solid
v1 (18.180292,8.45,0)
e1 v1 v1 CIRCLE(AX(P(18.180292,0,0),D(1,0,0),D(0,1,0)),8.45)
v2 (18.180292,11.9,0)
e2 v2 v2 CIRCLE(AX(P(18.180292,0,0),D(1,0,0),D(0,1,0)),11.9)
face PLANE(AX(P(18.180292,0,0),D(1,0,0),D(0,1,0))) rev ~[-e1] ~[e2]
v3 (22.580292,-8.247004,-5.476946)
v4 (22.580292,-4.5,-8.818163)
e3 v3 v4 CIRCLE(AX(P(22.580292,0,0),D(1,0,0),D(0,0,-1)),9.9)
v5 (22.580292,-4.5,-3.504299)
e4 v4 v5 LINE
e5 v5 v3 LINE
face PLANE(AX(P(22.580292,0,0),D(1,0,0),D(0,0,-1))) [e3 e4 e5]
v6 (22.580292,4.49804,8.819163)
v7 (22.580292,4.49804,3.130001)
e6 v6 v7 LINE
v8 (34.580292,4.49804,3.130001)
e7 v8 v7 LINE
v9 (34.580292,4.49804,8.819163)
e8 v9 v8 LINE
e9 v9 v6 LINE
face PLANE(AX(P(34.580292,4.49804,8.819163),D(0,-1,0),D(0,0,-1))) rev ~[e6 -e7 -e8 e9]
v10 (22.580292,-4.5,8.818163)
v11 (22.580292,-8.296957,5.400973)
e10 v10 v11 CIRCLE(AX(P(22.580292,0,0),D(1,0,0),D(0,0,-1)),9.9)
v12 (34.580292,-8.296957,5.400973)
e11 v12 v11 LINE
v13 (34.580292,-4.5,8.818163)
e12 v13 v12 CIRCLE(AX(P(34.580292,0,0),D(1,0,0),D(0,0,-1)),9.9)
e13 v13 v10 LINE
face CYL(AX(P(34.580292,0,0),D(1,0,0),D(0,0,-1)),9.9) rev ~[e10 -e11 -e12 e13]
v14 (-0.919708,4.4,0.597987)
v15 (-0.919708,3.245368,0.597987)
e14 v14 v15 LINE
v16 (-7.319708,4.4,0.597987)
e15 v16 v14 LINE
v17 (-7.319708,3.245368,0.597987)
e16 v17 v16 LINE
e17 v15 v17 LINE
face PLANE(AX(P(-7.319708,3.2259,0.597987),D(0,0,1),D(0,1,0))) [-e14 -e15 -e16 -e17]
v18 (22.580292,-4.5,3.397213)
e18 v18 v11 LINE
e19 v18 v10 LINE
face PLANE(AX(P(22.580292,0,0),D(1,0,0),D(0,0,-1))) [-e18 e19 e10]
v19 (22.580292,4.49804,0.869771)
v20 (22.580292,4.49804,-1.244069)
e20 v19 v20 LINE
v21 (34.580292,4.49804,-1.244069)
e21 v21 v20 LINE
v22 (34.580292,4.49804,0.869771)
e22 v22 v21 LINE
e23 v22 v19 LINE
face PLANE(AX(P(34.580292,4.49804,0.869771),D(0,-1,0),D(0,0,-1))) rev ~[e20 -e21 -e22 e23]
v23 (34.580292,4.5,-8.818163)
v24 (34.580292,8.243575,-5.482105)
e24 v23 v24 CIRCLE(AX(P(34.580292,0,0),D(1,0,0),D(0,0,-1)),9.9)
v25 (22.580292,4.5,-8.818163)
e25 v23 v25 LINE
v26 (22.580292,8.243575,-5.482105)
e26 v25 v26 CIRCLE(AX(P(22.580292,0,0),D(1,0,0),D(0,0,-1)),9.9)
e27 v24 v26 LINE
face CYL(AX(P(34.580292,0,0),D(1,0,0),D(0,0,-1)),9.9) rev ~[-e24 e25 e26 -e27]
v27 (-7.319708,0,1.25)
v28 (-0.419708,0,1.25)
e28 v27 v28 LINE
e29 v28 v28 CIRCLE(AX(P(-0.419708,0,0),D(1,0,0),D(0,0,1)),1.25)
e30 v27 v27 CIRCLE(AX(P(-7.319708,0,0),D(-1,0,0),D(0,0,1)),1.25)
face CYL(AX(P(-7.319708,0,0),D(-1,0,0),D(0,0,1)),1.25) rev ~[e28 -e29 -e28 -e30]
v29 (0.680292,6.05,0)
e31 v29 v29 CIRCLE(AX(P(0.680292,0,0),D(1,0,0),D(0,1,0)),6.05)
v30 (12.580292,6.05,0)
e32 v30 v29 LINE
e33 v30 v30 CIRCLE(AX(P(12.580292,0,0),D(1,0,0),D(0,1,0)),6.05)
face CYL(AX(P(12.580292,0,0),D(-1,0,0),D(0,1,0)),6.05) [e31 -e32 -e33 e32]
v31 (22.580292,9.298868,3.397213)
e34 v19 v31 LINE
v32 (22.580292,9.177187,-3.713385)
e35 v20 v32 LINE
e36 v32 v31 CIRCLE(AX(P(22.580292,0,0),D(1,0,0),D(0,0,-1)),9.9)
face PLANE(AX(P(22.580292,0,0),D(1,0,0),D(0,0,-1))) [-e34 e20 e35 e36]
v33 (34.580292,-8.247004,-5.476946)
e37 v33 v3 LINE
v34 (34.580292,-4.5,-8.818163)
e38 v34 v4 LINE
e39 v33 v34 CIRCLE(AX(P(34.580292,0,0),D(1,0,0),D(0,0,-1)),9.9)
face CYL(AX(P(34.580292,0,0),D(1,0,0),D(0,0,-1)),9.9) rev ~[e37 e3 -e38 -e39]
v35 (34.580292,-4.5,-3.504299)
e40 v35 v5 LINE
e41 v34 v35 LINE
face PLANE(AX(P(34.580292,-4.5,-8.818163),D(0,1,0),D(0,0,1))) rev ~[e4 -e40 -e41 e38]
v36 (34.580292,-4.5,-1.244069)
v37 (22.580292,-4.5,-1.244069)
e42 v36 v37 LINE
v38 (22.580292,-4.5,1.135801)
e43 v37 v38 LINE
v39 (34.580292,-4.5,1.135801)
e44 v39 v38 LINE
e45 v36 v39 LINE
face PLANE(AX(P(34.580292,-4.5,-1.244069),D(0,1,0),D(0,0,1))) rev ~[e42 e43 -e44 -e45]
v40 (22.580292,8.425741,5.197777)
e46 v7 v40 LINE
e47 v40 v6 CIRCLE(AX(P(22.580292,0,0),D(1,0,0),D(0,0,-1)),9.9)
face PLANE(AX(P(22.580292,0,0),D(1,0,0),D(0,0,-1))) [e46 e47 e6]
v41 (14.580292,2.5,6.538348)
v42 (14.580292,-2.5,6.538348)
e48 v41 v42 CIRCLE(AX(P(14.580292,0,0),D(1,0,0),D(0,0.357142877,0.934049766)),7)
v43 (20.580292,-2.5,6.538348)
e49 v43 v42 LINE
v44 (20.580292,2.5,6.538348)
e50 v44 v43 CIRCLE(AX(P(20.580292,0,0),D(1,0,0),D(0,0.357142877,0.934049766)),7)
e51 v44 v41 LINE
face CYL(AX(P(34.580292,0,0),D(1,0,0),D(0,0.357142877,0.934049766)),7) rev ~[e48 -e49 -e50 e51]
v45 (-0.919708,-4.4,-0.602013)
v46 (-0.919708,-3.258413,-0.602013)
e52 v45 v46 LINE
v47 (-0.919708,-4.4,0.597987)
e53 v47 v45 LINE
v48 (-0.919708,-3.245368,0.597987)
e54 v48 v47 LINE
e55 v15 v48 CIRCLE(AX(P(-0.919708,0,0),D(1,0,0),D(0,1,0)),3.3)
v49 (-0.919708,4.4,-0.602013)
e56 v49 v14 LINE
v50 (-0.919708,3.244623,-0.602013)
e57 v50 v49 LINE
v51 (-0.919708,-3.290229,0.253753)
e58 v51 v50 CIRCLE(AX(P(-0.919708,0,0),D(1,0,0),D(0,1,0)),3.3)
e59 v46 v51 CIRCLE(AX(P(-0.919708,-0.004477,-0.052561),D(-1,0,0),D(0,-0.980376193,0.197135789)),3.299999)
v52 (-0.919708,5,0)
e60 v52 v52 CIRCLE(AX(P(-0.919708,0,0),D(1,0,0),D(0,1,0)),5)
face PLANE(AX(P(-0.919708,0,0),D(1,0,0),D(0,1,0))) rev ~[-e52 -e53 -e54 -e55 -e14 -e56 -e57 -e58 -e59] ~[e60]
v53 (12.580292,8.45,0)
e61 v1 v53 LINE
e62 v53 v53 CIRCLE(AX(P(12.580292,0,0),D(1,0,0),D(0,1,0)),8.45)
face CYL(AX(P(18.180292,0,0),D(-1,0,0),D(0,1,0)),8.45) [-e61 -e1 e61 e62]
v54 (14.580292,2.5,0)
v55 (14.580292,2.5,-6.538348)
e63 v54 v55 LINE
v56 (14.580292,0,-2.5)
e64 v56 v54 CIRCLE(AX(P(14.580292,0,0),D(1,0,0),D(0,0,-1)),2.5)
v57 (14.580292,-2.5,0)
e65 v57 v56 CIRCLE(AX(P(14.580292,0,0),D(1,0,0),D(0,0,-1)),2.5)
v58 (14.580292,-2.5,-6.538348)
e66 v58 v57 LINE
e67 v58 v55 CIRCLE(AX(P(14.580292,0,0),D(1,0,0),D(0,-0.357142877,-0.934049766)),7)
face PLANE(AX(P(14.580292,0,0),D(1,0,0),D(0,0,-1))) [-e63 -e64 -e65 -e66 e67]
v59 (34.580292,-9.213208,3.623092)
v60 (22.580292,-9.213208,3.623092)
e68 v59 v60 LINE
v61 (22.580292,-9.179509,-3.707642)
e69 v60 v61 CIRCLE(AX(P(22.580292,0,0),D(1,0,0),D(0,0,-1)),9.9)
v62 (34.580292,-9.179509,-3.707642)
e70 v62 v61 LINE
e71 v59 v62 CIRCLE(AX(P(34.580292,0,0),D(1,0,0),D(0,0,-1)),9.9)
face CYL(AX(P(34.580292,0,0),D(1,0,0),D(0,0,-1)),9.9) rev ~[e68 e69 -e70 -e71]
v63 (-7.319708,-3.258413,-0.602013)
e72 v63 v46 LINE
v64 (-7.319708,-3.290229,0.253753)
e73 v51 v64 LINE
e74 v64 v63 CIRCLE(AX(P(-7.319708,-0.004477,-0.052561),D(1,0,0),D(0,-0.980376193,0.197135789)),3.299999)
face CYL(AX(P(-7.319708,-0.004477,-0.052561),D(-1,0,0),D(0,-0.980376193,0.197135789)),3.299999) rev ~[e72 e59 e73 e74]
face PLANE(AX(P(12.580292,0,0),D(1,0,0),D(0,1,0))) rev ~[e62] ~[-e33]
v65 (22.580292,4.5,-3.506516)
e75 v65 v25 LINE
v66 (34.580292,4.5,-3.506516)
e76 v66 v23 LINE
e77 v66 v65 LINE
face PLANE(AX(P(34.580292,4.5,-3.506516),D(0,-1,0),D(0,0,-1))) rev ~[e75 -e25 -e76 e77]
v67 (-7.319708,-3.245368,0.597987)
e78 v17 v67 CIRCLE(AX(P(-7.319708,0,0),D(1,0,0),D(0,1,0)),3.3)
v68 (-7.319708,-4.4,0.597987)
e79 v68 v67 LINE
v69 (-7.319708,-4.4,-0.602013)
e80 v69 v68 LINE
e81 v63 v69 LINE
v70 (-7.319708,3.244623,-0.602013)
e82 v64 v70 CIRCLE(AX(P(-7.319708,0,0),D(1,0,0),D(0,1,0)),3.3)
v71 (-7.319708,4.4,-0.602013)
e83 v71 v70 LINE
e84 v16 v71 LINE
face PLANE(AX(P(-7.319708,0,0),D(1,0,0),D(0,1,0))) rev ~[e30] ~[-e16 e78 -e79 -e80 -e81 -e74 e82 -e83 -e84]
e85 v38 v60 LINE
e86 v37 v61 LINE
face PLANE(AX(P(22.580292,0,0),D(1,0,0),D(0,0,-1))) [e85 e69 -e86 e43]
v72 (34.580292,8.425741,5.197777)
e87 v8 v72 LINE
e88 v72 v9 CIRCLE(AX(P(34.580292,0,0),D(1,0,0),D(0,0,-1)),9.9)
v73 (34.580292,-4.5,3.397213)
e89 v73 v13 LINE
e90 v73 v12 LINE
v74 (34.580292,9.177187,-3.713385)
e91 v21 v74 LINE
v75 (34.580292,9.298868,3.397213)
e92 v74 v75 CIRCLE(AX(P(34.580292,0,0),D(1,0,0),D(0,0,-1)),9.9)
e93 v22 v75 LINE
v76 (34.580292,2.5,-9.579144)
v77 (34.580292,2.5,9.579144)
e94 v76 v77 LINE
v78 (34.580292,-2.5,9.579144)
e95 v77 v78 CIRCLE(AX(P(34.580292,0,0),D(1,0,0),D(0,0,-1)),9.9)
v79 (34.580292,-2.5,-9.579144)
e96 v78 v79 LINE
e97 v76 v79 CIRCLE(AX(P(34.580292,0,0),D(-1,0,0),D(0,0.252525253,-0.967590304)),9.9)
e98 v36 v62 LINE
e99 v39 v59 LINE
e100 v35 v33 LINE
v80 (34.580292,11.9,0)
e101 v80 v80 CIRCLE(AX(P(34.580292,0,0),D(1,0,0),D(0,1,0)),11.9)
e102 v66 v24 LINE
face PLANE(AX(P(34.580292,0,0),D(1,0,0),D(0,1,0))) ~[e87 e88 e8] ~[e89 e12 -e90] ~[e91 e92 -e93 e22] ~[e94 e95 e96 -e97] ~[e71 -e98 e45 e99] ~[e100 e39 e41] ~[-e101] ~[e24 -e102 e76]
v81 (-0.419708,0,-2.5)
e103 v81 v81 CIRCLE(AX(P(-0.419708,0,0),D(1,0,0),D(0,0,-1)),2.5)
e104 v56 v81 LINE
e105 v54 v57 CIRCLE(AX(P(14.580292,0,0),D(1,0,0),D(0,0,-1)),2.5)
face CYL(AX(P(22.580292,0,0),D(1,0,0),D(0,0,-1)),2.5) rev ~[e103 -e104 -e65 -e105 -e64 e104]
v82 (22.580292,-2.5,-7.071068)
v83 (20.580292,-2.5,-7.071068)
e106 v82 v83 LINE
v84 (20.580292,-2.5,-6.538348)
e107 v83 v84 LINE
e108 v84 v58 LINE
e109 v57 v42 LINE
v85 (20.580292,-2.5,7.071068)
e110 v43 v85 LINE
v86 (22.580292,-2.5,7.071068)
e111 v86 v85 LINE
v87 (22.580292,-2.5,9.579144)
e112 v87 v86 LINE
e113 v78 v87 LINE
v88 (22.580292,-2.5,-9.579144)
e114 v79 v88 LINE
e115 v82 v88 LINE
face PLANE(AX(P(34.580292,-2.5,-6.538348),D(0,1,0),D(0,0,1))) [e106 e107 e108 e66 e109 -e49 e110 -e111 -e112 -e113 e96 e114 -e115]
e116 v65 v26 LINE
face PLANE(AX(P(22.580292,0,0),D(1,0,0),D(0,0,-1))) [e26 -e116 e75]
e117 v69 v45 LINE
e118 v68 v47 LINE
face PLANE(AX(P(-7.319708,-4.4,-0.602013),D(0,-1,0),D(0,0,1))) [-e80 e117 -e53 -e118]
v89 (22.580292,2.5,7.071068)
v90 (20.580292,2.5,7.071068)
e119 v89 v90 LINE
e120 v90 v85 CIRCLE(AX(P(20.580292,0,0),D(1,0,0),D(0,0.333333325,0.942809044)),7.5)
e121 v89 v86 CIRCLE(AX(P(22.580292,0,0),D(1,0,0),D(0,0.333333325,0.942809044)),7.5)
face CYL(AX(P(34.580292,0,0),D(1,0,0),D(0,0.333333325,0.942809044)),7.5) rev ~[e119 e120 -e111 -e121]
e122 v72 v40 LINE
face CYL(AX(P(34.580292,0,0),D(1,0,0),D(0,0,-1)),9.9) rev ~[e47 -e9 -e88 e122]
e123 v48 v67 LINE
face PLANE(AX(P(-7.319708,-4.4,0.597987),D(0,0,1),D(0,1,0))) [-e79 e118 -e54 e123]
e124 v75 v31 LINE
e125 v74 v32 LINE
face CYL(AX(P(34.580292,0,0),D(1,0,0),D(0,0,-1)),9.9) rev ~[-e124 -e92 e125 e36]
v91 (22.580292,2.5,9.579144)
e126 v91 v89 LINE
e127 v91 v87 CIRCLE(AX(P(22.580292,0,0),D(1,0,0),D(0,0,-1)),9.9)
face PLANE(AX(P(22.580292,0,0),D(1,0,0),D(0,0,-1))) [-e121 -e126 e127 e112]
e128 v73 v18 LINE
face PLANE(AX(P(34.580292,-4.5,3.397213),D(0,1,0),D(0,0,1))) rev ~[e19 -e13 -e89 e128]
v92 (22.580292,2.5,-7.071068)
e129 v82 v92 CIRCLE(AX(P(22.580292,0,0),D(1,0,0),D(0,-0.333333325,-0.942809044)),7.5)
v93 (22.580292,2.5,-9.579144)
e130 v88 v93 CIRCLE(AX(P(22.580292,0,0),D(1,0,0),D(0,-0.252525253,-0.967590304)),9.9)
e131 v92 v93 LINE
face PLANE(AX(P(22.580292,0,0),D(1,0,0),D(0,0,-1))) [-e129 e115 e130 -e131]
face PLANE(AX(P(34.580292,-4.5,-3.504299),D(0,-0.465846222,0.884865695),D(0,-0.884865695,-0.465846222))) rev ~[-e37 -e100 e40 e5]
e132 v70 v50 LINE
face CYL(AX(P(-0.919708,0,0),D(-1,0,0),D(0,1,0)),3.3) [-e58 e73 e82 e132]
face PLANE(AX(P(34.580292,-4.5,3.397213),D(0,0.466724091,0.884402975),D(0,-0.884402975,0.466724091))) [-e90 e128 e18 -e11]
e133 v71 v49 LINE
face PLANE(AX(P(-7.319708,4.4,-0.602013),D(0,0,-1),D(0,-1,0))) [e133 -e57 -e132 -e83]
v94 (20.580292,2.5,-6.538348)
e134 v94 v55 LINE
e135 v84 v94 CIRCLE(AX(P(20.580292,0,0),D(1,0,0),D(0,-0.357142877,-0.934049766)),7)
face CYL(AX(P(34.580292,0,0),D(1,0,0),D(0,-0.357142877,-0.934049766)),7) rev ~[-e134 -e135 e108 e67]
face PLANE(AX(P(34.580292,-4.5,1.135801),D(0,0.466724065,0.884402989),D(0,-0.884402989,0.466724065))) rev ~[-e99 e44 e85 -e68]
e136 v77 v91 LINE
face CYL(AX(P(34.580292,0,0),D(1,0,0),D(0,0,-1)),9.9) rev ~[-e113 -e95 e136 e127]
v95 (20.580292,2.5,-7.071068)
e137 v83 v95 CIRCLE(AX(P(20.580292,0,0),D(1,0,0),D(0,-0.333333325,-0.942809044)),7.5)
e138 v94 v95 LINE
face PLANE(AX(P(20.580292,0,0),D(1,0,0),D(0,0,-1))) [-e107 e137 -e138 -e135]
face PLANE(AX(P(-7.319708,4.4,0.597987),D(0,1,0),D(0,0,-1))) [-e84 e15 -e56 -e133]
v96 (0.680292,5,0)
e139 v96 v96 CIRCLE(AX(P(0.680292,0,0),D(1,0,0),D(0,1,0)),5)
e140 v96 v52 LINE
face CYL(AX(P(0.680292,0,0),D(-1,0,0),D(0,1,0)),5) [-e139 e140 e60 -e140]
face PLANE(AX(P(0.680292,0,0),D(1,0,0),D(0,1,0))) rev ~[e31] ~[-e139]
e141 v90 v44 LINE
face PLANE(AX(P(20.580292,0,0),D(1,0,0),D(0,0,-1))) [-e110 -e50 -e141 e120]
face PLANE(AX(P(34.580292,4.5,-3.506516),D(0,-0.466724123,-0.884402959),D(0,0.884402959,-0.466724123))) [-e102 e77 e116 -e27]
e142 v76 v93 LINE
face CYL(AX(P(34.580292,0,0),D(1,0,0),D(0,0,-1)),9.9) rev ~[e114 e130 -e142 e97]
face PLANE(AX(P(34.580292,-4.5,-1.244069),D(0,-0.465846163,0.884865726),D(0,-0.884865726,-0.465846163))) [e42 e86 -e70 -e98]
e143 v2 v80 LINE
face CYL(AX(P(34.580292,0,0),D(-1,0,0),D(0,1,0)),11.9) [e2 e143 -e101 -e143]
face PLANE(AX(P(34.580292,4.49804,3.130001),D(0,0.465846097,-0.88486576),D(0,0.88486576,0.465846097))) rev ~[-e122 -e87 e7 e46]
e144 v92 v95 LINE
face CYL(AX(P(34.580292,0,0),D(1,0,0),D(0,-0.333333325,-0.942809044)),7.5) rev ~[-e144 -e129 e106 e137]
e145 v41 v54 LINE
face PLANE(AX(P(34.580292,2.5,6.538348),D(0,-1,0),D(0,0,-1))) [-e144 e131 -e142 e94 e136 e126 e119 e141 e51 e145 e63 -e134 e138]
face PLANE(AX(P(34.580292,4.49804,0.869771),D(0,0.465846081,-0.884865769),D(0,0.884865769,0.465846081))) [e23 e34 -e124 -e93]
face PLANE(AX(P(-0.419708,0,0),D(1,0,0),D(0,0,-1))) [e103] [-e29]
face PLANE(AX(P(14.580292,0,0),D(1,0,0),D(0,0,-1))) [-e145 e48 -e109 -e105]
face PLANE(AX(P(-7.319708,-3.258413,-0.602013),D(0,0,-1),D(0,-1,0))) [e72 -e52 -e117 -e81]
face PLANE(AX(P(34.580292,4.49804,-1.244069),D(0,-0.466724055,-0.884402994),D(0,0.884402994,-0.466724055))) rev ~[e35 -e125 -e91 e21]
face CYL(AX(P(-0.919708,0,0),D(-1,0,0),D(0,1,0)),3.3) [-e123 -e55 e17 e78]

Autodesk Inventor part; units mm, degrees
ref_plane "YZ Plane" through (0, 0, 0) normal (1, 0, 0) x (0, 1, 0)
ref_plane "XZ Plane" through (0, 0, 0) normal (0, 1, 0) x (-1, 0, 0)
ref_plane "XY Plane" through (0, 0, 0) normal (0, 0, 1) x (1, 0, 0)
sketch "Sketch1" plane through (0, 0, 0) normal (0, 0, 1) x (1, 0, 0)
  line L0 (34.580292, 0) -> (34.580292, 11.9)
  line L1 (34.580292, 11.9) -> (28.380292, 11.9)
  line L2 (28.380292, 11.9) -> (18.180292, 11.9)
  line L3 (18.180292, 11.9) -> (18.180292, 8.45)
  line L4 (18.180292, 8.45) -> (12.580292, 8.45)
  line L5 (12.580292, 8.45) -> (12.580292, 6.05)
  line L6 (12.580292, 6.05) -> (0.680292, 6.05)
  line L7 (0.680292, 6.05) -> (0.680292, 5)
  line L8 (0.680292, 5) -> (-0.919708, 5)
  line L9 (-0.919708, 5) -> (-0.919708, 3.3)
  line L10 (-0.919708, 3.3) -> (-7.319708, 3.3)
  line L11 (-7.319708, 3.3) -> (-7.319708, 0)
  line L12 (-19.229424, 0) -> (45.657176, 0)
  line L13 (-7.319708, 0) -> (34.580292, 0)
  point P0 (0, 0)
  dimension "d0" = 11.9
  dimension "d1" = 6.2
  dimension "d2" = 10.2
  dimension "d3" = 3.45
  dimension "d4" = 5.6
  dimension "d5" = 2.4
  dimension "d6" = 11.9
  dimension "d7" = 1.05
  dimension "d8" = 1.6
  dimension "d9" = 1.7
  dimension "d54" = 6.4
revolve "Revolution1" add sketch "Sketch1" angle 360 about axis through (-19.229424, 0, 0) along (1, 0, 0)
sketch "Sketch2" plane through (-7.319708, 0, 0) normal (-1, 0, 0) x (0, 0, 1)
  circle A0 centre (0, 0) radius 3.3 projected
  circle A1 centre (0, 0) radius 1.25
  dimension "d12" = 2.5
extrude "Extrusion1" cut sketch "Sketch2" against normal through all contours A1
sketch "Sketch3" plane through (34.580292, 0, 0) normal (1, 0, 0) x (0, 0, -1)
  circle A0 centre (0, 0) radius 1.25
  circle A1 centre (0, 0) radius 11.9
  circle A2 centre (0, 0) radius 9.9
  line L0 (-9.579144, 2.5) -> (9.579144, 2.5)
  line L1 (1.244069, 4.49804) -> (3.713385, 9.177187)
  line L2 (3.506516, 4.5) -> (5.482105, 8.243575)
  line L3 (-0.869771, 4.49804) -> (-3.397213, 9.298868)
  line L4 (-3.130001, 4.49804) -> (-5.197777, 8.425741)
  line L5 (-8.819163, 4.49804) -> (-3.130001, 4.49804)
  line L6 (-0.869771, 4.49804) -> (1.244069, 4.49804)
  line L7 (3.506516, 4.5) -> (8.818163, 4.5)
  line L8 (-9.579144, -2.5) -> (9.579144, -2.5)
  line L9 (-3.397213, -4.5) -> (-5.400973, -8.296957)
  line L10 (-1.135801, -4.5) -> (-3.623092, -9.213208)
  line L11 (3.504299, -4.5) -> (5.476946, -8.247004)
  line L12 (1.244069, -4.5) -> (3.707642, -9.179509)
  line L13 (8.818163, -4.5) -> (3.504299, -4.5)
  line L14 (1.244069, -4.5) -> (-1.135801, -4.5)
  line L15 (-3.397213, -4.5) -> (-8.818163, -4.5)
  dimension "d16" = 19.8
  dimension "d15" = 23.8
  dimension "d18" = 2.5
  dimension "d19" = 2
  dimension "d20" = 2
  dimension "d24" = 2
  dimension "d25" = 2
  dimension "d26" = 2
  dimension "d28" = 2.5
extrude "Extrusion2" cut sketch "Sketch3" against normal blind 12 contours A2 L8 L0 | L7 L2 A2 | A2 L11 L13 | A2 L4 L5 | L15 L9 A2 | L1 L6 L3 A2 | A2 L10 L14 L12
sketch "Sketch4" plane through (-7.319708, 0, 0) normal (-1, 0, 0) x (0, 0, 1)
  circle A0 centre (0, 0) radius 1.25
  circle A1 centre (0, 0) radius 3.3
  line L0 (-0.602013, 3.244623) -> (-0.602013, 4.4)
  line L1 (0, 7.165541) -> (0, -7.239273)
  arc A2 (-0.602013, -3.258413) -> (0.597987, -3.239718) centre (-0.052561, -0.004477) ccw
  arc A3 (0.597987, 3.2259) -> (-0.602013, 3.244623) centre (-0.052561, -0.004477) ccw
  line L2 (-7.277237, 0) -> (-5, 0)
  line L3 (-3.3, 0) -> (3.3, 0)
  line L4 (5, 0) -> (7.340981, 0)
  line L5 (0.597987, 4.4) -> (0.597987, 3.2259)
  line L6 (-0.602013, 4.4) -> (0.597987, 4.4)
  line L7 (-0.602013, -4.4) -> (0.597987, -4.4)
  line L8 (-0.602013, -4.4) -> (-0.602013, -3.244623)
  line L9 (0.597987, -4.4) -> (0.597987, -3.239718)
  dimension "d32" = 0
  dimension "d40" = 4.4
  dimension "d42" = 1.2
  dimension "d44" = 1.2
sketch "Sketch4 outline for Extrusion3" plane through (-7.319708, 0, 0) normal (-1, 0, 0) x (0, 0, 1)
  line L0 (-0.602013, -3.258413) -> (-0.602013, -4.4)
  arc A0 (0.597987, -3.239718) -> (-0.602013, -3.258413) centre (-0.052561, -0.004477) cw
  line L1 (0.597987, -4.4) -> (0.597987, -3.239718)
  line L2 (-0.602013, -4.4) -> (0.597987, -4.4)
  line L3 (-0.602013, 4.4) -> (-0.602013, 3.244623)
  line L4 (0.597987, 4.4) -> (-0.602013, 4.4)
  line L5 (0.597987, 3.2259) -> (0.597987, 4.4)
  arc A1 (-0.602013, 3.244623) -> (0.597987, 3.2259) centre (-0.052561, -0.004477) cw
extrude "Extrusion3" add sketch "Sketch4 outline for Extrusion3" against normal blind 7
sketch "Sketch5" plane through (22.580292, 0, 0) normal (1, 0, 0) x (0, 0, -1)
  circle A0 centre (0, 0) radius 1.25
  line L0 (9.579144, 2.5) -> (-9.579144, 2.5)
  arc A1 (-9.579144, 2.5) -> (-9.579144, -2.5) centre (0, 0) ccw
  circle A2 centre (0, 0) radius 2.5
extrude "Extrusion4" cut sketch "Sketch5" against normal blind 23
sketch "Sketch7" plane through (34.580292, 0, 0) normal (1, 0, 0) x (0, 0, -1)
  line L0 (9.579144, -2.5) -> (-9.579144, -2.5)
  line L1 (-9.579144, 2.5) -> (9.579144, 2.5)
  circle A0 centre (0, 0) radius 11.9
  arc A1 (7.071068, -2.5) -> (7.071068, 2.5) centre (0, 0) ccw
  arc A2 (-7.071068, 2.5) -> (-7.071068, -2.5) centre (0, 0) ccw
  dimension "d49" = 7.5
  dimension "d50" = 7.5
extrude "Extrusion5" cut sketch "Sketch7" against normal blind 14 contours L0 A2 L1 A1
sketch "Sketch8" plane through (34.580292, 0, 0) normal (1, 0, 0) x (0, 0, -1)
  line L0 (9.579144, -2.5) -> (-9.579144, -2.5)
  line L1 (-9.579144, 2.5) -> (9.579144, 2.5)
  arc A0 (-7.071068, 2.5) -> (-7.071068, -2.5) centre (0, 0) ccw
  arc A1 (7.071068, -2.5) -> (7.071068, 2.5) centre (0, 0) ccw
  arc A2 (6.538348, -2.5) -> (6.538348, 2.5) centre (0, 0) ccw
  arc A3 (-6.538348, 2.5) -> (-6.538348, -2.5) centre (0, 0) ccw
extrude "Extrusion6" cut sketch "Sketch8" against normal blind 20 contours L0 A3 L1 A2
equation "\"d50\" = d49"
properties part number "DrivingShaft"
